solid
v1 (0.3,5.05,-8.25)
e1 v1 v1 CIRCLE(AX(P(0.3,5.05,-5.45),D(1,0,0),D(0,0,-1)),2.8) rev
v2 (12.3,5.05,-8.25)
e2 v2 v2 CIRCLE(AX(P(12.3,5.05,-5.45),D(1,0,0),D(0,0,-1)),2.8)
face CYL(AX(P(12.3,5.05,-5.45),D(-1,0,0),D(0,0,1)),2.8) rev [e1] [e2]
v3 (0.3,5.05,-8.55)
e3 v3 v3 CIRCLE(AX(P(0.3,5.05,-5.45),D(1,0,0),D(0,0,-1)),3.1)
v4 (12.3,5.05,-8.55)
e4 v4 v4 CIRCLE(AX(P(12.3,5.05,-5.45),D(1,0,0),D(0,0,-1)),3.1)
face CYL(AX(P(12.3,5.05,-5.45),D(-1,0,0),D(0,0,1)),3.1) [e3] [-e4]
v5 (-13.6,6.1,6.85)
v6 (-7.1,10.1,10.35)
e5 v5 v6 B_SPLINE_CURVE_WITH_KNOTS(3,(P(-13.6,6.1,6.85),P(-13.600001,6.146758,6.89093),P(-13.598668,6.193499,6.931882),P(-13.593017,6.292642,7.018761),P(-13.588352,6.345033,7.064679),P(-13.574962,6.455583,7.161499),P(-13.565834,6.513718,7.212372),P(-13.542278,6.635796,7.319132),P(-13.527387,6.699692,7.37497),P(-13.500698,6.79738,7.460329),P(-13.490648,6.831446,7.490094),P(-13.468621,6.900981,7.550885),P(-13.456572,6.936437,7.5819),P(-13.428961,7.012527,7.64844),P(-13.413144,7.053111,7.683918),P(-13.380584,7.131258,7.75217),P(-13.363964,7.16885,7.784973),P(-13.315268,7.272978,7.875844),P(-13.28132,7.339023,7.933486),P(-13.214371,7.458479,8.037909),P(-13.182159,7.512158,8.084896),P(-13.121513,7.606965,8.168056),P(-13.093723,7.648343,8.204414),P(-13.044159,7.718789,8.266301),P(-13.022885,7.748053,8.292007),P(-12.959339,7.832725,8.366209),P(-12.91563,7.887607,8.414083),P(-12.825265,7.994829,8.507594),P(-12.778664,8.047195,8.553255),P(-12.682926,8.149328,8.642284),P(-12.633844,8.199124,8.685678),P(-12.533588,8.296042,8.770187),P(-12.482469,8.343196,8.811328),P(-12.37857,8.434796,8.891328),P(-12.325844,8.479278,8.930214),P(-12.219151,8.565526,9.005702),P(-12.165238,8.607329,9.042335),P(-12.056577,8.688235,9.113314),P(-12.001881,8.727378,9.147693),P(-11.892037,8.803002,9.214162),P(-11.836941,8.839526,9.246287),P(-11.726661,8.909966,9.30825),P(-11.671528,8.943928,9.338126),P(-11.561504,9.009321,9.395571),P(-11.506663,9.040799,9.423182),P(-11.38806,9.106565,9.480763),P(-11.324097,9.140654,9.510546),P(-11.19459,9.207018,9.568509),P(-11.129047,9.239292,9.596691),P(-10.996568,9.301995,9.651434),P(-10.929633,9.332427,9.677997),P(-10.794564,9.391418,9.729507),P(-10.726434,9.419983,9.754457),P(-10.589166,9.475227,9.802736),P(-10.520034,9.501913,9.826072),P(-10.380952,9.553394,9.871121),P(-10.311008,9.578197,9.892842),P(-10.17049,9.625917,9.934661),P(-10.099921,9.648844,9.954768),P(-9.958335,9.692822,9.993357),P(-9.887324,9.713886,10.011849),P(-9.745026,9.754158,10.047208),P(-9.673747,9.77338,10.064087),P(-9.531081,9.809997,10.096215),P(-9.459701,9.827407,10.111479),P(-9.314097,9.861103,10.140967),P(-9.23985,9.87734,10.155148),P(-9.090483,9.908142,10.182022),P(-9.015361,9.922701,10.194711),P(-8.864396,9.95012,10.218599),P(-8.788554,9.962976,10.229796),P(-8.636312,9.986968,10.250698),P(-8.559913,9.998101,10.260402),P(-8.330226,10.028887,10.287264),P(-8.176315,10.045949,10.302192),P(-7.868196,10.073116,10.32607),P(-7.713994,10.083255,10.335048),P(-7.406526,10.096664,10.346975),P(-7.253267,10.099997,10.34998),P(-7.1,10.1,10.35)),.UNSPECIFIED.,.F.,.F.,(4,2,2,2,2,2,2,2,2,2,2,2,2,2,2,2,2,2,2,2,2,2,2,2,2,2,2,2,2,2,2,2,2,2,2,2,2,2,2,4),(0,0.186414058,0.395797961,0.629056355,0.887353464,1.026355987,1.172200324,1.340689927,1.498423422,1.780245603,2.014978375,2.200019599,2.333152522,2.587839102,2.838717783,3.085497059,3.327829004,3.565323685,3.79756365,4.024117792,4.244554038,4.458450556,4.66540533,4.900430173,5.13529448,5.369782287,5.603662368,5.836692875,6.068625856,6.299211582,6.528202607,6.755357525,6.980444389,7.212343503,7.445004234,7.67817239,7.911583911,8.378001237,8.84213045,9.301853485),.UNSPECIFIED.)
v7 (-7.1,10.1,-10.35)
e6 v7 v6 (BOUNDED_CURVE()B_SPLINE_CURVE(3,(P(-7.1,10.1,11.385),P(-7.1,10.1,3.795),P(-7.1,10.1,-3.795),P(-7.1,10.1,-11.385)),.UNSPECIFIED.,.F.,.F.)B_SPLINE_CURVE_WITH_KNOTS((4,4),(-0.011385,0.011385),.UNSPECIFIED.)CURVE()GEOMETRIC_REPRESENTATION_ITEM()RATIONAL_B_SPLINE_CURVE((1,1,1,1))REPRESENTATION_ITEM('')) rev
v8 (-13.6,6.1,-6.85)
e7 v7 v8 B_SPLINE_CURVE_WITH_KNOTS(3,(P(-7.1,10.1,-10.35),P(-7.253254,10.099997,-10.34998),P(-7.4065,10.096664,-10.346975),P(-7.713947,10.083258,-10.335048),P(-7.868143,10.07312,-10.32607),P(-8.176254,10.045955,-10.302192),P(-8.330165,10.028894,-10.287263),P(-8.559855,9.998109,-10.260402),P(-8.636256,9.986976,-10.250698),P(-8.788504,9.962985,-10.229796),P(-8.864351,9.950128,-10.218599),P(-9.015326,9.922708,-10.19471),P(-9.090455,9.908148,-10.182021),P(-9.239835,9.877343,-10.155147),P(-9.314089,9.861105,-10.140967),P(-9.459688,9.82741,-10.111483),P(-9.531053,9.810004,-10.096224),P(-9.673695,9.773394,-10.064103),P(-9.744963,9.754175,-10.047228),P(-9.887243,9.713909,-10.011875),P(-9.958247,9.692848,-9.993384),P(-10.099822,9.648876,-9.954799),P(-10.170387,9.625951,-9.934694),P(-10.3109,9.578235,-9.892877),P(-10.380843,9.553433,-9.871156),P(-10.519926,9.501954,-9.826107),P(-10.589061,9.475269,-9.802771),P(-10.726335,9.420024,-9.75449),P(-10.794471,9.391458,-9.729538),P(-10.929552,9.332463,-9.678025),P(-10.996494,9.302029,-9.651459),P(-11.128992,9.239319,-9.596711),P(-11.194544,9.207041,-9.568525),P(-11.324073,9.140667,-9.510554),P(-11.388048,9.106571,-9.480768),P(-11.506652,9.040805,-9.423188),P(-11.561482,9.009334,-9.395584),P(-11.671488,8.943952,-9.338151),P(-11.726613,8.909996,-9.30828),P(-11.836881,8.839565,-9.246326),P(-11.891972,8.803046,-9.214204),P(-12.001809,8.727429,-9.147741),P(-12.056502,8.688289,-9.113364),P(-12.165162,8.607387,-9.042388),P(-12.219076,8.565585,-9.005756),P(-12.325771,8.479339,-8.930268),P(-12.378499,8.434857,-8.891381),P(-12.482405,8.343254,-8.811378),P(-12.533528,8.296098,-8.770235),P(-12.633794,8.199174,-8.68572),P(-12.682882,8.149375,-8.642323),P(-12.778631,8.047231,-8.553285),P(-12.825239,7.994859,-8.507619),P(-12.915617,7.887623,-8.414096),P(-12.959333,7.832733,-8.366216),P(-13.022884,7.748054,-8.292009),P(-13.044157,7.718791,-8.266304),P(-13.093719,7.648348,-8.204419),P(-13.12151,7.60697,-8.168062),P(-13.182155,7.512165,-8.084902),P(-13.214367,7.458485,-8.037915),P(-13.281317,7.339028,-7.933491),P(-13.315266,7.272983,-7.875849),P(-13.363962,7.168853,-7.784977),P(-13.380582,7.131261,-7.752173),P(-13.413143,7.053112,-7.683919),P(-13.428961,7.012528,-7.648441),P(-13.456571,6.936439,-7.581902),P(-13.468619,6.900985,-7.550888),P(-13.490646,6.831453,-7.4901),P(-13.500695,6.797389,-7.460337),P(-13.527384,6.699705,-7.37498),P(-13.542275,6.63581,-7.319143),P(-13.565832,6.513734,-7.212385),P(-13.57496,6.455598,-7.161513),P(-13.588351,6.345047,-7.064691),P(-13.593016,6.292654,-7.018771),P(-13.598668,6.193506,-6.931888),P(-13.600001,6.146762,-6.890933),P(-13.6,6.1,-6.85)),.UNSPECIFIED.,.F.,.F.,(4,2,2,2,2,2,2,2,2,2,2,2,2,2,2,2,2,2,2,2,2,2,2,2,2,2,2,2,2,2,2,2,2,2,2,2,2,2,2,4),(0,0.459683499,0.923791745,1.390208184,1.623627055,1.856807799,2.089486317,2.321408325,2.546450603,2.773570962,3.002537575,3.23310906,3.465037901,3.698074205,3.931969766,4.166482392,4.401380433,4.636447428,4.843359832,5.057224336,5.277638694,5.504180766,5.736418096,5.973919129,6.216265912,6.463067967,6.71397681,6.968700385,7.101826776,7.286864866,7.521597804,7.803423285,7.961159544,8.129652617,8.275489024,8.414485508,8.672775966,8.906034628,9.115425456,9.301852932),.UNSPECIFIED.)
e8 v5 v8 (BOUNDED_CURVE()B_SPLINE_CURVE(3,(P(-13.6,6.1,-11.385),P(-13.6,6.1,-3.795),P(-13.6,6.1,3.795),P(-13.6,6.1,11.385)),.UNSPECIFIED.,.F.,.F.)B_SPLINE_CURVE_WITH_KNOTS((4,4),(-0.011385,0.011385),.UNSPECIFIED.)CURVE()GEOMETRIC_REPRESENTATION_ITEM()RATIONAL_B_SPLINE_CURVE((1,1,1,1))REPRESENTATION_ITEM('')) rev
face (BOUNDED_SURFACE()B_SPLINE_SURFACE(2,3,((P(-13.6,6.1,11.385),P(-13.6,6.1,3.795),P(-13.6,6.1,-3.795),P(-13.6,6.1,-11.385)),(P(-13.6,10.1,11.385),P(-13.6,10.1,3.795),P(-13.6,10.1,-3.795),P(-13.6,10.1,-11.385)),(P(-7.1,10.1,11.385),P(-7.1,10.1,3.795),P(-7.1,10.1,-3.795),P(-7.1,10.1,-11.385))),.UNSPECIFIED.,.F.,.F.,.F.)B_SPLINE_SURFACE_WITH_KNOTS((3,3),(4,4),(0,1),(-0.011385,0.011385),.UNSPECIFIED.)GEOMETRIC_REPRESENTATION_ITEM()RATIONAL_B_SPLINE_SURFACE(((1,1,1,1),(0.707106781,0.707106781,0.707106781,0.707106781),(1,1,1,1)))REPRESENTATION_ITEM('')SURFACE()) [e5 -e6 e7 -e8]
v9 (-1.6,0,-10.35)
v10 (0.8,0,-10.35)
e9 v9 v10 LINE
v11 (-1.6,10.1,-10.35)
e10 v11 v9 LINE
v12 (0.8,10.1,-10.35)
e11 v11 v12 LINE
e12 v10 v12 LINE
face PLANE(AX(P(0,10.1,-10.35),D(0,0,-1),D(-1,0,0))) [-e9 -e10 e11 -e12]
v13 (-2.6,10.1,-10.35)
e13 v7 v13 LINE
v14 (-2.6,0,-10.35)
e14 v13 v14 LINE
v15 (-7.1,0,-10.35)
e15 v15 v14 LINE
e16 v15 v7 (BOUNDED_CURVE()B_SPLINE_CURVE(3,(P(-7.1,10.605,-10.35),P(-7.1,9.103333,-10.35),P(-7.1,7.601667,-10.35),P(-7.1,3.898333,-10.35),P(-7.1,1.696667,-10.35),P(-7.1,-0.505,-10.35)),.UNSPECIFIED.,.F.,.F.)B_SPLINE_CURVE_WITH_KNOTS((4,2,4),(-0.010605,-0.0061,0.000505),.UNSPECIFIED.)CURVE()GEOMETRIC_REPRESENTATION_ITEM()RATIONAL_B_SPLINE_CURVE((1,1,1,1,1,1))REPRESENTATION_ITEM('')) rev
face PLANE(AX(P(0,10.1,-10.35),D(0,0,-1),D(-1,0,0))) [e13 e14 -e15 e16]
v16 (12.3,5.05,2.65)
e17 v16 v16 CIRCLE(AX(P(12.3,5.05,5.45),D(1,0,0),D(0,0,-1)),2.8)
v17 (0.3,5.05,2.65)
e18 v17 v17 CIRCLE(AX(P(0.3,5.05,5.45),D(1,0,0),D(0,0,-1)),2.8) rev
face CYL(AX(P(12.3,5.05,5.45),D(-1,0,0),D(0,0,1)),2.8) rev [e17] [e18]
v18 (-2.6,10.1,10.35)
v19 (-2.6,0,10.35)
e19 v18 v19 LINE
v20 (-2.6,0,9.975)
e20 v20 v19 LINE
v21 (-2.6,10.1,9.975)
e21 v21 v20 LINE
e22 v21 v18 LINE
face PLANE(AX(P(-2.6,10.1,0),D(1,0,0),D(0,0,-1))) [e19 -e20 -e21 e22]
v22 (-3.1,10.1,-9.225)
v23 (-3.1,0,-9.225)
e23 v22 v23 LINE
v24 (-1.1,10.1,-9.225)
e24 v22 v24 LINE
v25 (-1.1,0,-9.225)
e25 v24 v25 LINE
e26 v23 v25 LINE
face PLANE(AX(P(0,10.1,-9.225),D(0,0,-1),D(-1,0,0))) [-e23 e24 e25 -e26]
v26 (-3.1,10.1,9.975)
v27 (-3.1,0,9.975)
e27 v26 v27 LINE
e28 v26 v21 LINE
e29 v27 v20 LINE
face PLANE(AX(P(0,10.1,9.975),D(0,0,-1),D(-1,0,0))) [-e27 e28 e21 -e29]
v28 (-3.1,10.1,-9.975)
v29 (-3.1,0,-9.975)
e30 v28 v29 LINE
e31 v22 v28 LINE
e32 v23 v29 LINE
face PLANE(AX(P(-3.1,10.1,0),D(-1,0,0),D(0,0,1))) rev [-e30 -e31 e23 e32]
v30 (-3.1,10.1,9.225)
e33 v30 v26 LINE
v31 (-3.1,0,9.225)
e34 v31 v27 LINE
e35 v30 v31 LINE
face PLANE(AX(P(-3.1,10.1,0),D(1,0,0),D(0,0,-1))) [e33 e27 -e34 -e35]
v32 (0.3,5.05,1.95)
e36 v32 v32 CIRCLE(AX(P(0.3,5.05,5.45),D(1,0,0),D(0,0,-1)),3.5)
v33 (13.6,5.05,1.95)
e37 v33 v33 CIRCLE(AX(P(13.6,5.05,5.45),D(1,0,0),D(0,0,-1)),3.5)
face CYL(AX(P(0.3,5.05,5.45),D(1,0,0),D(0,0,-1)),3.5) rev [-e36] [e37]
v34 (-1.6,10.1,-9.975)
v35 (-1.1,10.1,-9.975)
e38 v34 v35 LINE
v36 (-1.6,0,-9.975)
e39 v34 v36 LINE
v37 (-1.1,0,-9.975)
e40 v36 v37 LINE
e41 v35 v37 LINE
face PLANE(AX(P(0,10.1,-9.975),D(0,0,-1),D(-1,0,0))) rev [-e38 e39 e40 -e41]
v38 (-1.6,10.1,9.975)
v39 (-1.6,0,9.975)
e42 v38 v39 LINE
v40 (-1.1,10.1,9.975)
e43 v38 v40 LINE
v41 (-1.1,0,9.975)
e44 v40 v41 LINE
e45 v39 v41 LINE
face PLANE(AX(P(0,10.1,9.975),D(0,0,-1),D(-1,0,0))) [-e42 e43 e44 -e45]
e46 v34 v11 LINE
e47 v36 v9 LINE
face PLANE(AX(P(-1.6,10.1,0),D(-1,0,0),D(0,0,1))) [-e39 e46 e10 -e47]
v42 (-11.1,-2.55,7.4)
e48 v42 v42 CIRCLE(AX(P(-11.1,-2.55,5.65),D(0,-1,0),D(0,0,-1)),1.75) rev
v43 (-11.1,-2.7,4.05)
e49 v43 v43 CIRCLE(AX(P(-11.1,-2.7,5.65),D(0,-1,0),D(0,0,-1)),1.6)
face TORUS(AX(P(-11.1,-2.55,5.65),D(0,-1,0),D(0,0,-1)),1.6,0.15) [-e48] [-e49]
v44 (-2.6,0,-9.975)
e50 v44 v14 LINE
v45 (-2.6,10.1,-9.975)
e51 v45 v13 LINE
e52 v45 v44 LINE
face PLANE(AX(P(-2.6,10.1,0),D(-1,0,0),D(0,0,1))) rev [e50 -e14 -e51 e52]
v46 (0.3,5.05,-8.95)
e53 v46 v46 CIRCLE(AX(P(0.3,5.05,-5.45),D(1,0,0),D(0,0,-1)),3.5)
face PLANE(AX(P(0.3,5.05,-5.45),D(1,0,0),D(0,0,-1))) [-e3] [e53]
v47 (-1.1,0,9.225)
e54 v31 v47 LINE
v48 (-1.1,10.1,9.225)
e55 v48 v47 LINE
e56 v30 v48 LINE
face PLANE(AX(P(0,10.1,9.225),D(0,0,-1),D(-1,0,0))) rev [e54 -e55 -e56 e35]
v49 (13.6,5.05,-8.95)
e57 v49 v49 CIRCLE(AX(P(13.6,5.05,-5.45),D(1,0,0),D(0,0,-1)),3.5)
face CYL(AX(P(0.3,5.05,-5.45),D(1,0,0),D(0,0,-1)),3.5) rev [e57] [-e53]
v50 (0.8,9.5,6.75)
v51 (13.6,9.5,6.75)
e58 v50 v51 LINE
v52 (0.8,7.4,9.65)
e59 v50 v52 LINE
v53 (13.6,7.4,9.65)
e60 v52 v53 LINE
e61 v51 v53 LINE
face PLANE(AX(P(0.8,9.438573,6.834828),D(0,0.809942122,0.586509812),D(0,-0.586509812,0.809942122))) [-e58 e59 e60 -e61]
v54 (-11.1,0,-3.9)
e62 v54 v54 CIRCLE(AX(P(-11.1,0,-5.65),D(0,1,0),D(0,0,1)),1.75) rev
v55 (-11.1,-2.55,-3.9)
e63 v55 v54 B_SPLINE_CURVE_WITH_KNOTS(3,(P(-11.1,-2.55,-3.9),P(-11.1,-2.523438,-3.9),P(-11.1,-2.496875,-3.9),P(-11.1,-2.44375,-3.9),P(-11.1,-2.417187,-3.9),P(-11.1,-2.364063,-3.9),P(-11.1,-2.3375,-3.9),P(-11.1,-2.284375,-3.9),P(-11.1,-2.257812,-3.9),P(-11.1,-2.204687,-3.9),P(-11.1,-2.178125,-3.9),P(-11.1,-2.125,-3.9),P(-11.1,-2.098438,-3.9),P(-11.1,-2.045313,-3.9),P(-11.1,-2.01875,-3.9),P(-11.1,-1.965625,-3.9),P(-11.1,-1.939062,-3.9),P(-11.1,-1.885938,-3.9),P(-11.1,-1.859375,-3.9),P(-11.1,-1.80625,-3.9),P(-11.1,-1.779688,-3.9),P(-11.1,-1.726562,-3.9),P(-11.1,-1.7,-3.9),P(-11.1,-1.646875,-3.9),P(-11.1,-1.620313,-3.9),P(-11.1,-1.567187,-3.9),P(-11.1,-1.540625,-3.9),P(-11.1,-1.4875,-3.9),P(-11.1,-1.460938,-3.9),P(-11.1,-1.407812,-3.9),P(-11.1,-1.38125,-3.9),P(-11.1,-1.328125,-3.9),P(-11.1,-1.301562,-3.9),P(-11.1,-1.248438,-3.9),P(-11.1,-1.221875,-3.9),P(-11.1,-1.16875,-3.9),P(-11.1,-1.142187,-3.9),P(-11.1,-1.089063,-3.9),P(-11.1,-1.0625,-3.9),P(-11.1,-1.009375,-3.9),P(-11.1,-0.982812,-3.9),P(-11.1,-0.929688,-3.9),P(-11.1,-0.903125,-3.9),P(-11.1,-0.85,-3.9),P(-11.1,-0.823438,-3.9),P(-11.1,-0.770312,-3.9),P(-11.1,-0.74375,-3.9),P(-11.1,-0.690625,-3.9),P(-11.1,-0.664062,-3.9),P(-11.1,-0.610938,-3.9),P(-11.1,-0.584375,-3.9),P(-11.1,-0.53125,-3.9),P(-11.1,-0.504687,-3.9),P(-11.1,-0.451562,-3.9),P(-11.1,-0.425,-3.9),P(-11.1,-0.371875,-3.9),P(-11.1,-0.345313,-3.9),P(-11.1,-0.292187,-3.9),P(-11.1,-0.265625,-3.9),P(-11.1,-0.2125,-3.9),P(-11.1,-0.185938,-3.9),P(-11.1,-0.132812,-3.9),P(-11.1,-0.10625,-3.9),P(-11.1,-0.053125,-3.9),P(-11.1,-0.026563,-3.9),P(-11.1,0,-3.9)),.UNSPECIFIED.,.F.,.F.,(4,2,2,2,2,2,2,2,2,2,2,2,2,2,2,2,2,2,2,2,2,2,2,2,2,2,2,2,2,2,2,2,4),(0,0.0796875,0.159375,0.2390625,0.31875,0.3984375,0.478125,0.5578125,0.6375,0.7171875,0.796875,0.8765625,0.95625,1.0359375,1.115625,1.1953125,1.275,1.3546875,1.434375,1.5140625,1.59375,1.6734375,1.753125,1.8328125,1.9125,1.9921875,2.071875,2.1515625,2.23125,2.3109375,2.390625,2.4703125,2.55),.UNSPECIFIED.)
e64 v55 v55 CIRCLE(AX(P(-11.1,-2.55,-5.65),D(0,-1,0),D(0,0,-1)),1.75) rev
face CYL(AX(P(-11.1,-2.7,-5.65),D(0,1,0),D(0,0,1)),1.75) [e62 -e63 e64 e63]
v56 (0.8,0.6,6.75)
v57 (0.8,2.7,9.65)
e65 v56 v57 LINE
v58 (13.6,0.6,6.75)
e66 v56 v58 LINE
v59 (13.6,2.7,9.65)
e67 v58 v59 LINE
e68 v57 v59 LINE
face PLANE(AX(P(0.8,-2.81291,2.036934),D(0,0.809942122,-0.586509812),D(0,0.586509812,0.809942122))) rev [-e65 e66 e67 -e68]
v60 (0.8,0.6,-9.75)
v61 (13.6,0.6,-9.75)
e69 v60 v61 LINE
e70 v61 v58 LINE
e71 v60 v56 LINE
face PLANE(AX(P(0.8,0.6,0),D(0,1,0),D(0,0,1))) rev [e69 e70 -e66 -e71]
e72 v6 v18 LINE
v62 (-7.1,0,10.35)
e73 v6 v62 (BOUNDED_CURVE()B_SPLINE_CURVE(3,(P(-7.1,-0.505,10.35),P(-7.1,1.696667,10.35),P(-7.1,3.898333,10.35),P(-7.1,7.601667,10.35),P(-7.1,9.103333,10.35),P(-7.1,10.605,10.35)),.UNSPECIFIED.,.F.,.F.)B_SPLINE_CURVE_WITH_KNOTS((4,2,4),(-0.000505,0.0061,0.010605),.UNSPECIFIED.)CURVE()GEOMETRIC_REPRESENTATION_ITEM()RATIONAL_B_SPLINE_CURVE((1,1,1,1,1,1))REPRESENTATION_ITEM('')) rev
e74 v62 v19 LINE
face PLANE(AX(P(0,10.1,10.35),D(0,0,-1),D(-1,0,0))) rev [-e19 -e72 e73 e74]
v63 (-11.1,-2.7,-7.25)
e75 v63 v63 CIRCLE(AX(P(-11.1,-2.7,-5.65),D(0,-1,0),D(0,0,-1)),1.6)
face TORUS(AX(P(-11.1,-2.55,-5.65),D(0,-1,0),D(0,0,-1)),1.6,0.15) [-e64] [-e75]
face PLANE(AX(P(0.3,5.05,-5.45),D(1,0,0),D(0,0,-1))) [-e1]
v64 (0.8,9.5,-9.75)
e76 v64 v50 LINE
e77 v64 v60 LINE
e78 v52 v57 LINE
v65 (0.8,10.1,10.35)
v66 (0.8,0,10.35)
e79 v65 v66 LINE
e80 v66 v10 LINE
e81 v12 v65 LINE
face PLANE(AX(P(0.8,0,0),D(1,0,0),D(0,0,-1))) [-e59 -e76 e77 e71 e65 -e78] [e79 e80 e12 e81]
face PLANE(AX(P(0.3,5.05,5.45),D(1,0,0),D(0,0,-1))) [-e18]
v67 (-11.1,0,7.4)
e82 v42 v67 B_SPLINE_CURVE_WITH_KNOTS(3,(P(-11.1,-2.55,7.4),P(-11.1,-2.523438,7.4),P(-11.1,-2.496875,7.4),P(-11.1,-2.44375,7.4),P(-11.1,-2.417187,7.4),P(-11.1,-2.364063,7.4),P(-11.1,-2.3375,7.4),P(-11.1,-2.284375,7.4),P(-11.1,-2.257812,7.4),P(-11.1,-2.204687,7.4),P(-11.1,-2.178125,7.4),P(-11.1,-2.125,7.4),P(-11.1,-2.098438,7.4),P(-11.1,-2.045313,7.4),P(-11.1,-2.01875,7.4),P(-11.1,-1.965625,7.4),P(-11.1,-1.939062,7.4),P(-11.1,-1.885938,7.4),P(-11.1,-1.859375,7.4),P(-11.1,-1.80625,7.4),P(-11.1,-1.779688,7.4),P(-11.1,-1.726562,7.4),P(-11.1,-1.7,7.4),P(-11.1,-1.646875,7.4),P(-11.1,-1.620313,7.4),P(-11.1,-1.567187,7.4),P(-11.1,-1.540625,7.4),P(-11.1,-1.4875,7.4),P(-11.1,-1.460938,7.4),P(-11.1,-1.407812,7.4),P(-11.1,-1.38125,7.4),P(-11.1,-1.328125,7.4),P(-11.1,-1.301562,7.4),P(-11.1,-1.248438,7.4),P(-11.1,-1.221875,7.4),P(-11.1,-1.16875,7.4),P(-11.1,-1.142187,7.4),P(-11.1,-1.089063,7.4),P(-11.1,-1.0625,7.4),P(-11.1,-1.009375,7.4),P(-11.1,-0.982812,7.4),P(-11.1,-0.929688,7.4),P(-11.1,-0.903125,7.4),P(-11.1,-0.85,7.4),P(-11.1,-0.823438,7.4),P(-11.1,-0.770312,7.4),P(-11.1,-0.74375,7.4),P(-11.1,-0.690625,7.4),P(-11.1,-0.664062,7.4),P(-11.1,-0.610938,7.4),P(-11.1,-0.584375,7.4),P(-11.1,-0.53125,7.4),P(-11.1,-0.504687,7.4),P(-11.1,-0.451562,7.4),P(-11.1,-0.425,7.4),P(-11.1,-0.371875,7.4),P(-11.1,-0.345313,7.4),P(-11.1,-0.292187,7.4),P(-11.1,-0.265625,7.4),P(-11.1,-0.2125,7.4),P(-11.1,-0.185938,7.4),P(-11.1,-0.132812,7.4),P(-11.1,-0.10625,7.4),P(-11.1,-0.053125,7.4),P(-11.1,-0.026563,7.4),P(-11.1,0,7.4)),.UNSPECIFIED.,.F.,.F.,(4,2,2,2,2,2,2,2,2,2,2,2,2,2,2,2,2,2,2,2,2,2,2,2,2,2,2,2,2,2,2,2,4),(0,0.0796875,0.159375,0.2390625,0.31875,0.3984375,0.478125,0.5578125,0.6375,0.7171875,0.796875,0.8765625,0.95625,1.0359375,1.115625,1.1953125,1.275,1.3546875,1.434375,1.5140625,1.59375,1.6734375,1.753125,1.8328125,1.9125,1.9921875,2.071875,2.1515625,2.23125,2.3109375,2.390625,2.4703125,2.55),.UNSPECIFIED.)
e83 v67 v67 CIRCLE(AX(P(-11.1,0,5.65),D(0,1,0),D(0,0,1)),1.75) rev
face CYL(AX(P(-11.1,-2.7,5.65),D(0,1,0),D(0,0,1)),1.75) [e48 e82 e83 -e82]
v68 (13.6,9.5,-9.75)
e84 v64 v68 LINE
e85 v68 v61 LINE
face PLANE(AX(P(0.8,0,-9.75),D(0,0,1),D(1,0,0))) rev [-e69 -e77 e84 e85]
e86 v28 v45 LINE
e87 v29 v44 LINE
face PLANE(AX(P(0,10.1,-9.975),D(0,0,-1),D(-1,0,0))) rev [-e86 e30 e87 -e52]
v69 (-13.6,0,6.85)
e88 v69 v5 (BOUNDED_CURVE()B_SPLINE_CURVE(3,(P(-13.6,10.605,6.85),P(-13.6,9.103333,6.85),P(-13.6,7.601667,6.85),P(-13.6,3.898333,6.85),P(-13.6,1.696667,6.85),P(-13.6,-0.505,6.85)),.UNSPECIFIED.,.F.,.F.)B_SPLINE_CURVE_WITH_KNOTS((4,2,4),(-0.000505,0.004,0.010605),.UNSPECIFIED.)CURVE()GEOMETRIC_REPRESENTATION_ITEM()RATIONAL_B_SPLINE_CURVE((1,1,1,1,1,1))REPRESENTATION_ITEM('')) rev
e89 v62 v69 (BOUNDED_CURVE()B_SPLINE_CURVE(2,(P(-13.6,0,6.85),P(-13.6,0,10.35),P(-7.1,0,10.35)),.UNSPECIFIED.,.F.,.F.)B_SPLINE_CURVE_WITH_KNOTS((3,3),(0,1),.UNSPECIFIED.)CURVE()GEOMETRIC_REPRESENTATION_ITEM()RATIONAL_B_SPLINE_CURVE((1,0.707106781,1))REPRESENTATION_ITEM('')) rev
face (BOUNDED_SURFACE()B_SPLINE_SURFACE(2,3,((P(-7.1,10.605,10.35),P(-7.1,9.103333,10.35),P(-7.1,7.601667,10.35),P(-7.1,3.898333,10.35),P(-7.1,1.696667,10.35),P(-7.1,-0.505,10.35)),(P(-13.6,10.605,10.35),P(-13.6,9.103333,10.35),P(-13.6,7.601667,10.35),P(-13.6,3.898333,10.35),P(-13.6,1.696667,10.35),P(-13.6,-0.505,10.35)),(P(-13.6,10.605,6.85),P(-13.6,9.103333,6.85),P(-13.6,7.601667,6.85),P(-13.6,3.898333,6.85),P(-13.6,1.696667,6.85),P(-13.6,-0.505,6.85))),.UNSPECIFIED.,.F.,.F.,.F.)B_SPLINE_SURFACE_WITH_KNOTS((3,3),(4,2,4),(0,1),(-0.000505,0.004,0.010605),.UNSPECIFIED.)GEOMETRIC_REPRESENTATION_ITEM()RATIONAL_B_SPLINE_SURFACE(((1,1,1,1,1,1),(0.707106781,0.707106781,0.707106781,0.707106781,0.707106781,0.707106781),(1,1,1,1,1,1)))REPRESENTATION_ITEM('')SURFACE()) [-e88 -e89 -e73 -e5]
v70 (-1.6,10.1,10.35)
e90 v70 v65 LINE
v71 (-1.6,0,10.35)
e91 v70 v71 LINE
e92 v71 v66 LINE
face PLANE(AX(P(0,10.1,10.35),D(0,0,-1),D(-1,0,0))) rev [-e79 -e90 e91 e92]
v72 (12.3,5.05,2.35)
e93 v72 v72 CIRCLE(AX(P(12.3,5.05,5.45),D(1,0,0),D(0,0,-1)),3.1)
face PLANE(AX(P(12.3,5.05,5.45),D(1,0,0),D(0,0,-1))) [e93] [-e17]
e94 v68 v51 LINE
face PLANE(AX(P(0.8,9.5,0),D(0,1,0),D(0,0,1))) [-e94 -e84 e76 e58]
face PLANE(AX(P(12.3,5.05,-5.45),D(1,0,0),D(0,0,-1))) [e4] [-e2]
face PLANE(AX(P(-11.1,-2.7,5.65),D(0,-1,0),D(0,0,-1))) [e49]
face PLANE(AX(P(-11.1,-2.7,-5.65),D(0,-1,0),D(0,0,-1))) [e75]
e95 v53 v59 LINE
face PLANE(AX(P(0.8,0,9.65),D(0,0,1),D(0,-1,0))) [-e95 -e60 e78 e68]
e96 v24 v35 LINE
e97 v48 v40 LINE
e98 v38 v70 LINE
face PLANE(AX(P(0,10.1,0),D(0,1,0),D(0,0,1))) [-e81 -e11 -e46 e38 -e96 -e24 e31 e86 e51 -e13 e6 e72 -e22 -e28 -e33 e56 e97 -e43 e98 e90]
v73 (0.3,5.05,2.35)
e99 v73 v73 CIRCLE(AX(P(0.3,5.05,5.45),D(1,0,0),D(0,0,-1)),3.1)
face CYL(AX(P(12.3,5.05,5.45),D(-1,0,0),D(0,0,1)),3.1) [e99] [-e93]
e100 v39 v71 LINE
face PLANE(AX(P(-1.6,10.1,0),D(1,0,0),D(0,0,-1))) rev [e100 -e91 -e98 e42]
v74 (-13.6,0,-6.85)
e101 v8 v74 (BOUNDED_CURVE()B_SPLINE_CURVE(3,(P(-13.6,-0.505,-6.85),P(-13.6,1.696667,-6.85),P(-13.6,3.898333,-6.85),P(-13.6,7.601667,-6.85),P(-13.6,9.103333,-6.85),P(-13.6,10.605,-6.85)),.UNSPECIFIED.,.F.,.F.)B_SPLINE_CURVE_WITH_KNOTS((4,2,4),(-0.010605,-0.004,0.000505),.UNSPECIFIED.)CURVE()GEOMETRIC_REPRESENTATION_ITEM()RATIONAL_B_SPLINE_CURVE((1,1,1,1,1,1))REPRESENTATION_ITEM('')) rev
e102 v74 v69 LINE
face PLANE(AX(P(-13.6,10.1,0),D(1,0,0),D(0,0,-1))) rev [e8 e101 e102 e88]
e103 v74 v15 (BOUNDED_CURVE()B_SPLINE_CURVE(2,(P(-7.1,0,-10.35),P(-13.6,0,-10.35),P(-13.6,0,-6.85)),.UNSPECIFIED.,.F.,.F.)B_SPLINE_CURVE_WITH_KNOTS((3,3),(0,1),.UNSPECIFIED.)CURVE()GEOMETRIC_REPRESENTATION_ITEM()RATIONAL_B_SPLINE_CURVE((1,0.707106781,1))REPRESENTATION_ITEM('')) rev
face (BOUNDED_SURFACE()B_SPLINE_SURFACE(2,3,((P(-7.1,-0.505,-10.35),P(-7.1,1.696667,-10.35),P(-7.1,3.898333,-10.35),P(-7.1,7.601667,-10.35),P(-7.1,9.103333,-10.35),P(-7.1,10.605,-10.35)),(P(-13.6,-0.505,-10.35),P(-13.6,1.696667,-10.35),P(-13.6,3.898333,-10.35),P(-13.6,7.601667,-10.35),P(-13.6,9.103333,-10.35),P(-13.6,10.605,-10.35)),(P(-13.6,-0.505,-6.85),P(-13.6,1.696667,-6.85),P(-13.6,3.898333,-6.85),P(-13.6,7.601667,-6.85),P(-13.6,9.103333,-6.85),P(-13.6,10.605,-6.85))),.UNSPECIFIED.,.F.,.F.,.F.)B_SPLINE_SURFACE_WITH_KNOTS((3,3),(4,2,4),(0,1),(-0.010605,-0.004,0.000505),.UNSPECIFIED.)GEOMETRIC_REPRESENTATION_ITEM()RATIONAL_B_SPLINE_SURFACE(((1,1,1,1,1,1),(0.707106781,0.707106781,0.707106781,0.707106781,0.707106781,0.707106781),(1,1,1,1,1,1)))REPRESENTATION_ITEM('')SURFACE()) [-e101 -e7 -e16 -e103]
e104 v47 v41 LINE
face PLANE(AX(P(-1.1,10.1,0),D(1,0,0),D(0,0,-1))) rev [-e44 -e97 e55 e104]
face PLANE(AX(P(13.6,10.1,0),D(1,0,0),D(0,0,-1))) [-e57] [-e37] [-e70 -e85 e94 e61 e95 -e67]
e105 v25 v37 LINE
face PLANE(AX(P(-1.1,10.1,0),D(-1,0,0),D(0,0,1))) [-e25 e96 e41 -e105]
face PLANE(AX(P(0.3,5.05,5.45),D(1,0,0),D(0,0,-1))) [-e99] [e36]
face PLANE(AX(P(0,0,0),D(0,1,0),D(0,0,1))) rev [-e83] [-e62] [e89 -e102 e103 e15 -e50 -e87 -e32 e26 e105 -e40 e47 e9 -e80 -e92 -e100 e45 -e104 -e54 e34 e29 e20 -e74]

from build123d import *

# Parameters (mm, degrees)
SKETCH1_W           = 6.5
SKETCH1_H           = 20.7
BOSS_EXTRUDE1_DEPTH = 10.1
FILLET1_SIZE        = 4
FILLET1_SIZE_2      = 6.5
FILLET2_SIZE        = 3.5
FILLET2_SIZE_2      = 6.5
SKETCH4_R           = 1.75
BOSS_EXTRUDE3_DEPTH = 2.7
FILLET4_R           = 0.15
SKETCH2_W           = 20.7
SKETCH2_H           = 10.1
CUT_EXTRUDE1_DEPTH  = 12.8
SKETCH5_R           = 3.5
CUT_EXTRUDE2_DEPTH  = 13.3
SKETCH6_R           = 3.1
SKETCH6_R_2         = 2.8
BOSS_EXTRUDE4_DEPTH = 12


with BuildPart() as part:
    # Sketch1 → Boss-Extrude1 (new body)
    with BuildSketch(Plane(origin=(0, 0, 0), x_dir=(1, 0, 0), z_dir=(0, 1, 0))):
        Polygon((-2.6, 10.35), (-7.1, 10.35), (-7.1, -10.35), (-2.6, -10.35), (-2.6, -9.975), (-3.1, -9.975), (-3.1, -9.225), (-1.1, -9.225), (-1.1, -9.975), (-1.6, -9.975), (-1.6, -10.35), (13.6, -10.35), (13.6, 10.35), (-1.6, 10.35), (-1.6, 9.975), (-1.1, 9.975), (-1.1, 9.225), (-3.1, 9.225), (-3.1, 9.975), (-2.6, 9.975), align=None)
        with Locations((-10.35, 0)):
            Rectangle(SKETCH1_W, SKETCH1_H)
    extrude(amount=BOSS_EXTRUDE1_DEPTH)

    # Fillet1
    # a fillet whose section is not a circle: 6.5, 4 mm, written as the material it takes off along each edge
    with BuildSketch(Plane(origin=(-13.6, 10.1, -26.6), x_dir=(0, -1, 0), z_dir=(0, 0, 1))) as fillet1_piece_1:
        with BuildLine():
            Bezier((FILLET1_SIZE, 0), (0, 0), (0, FILLET1_SIZE_2), weights=[1, 0.707106781, 1])
            Line((0, FILLET1_SIZE_2), (0, 0))
            Line((0, 0), (FILLET1_SIZE, 0))
        make_face()
    extrude(amount=53.2, mode=Mode.SUBTRACT)

    # Fillet2
    # a fillet whose section is not a circle: 6.5, 3.5 mm, written as the material it takes off along each edge
    with BuildSketch(Plane(origin=(-13.6, -16.25, 10.35), x_dir=(0, 0, -1), z_dir=(0, 1, 0))) as fillet2_piece_1:
        with BuildLine():
            Bezier((FILLET2_SIZE, 0), (0, 0), (0, -FILLET2_SIZE_2), weights=[1, 0.707106781, 1])
            Line((0, -FILLET2_SIZE_2), (0, 0))
            Line((0, 0), (FILLET2_SIZE, 0))
        make_face()
    extrude(amount=38.6, mode=Mode.SUBTRACT)
    with BuildSketch(Plane(origin=(-13.6, -16.25, -10.35), x_dir=(1, 0, 0), z_dir=(0, 1, 0))) as fillet2_piece_2:
        with BuildLine():
            Bezier((FILLET2_SIZE_2, 0), (0, 0), (0, -FILLET2_SIZE), weights=[1, 0.707106781, 1])
            Line((0, -FILLET2_SIZE), (0, 0))
            Line((0, 0), (FILLET2_SIZE_2, 0))
        make_face()
    extrude(amount=38.6, mode=Mode.SUBTRACT)

    # Sketch4 → Boss-Extrude3 (add)
    with BuildSketch(Plane.XZ):
        with Locations(Location((-11.1, -5.65, 0), (0, 0, 90))):
            Circle(SKETCH4_R)
        with Locations(Location((-11.1, 5.65, 0), (0, 0, 90))):
            Circle(SKETCH4_R)
    extrude(amount=BOSS_EXTRUDE3_DEPTH)

    # Fillet4
    fillet4_edges = [part.edges().sort_by_distance(p)[0] for p in [
        (-11.1, -2.7, -7.4),
        (-11.1, -2.7, 3.9),
    ]]
    fillet(fillet4_edges, radius=FILLET4_R)

    # Sketch2 → Cut-Extrude1 (cut)
    with BuildSketch(Plane(origin=(13.6, 0, 0), x_dir=(0, 0, -1), z_dir=(1, 0, 0))):
        with Locations((0, 5.05)):
            Rectangle(SKETCH2_W, SKETCH2_H)
        Polygon((-9.65, 7.4), (-9.65, 2.7), (-6.75, 0.6), (6.85, 0.6), (9.75, 0.6), (9.75, 9.5), (6.85, 9.5), (-6.75, 9.5), align=None, mode=Mode.SUBTRACT)
    extrude(amount=-CUT_EXTRUDE1_DEPTH, mode=Mode.SUBTRACT)

    # Sketch5 → Cut-Extrude2 (cut)
    with BuildSketch(Plane(origin=(13.6, 0, 0), x_dir=(0, 0, -1), z_dir=(1, 0, 0))):
        with Locations((-5.45, 5.05)):
            Circle(SKETCH5_R)
        with Locations((5.45, 5.05)):
            Circle(SKETCH5_R)
    extrude(amount=-CUT_EXTRUDE2_DEPTH, mode=Mode.SUBTRACT)

    # Sketch6 → Boss-Extrude4 (add)
    # profile 1 of 2: a face of its own
    with BuildSketch(Plane(origin=(0.3, 0, 0), x_dir=(0, 0, -1), z_dir=(1, 0, 0))):
        with Locations((-5.45, 5.05)):
            Circle(SKETCH6_R)
        with Locations((-5.45, 5.05)):
            Circle(SKETCH6_R_2, mode=Mode.SUBTRACT)
    # profile 2 of 2: a face of its own
    with BuildSketch(Plane(origin=(0.3, 0, 0), x_dir=(0, 0, -1), z_dir=(1, 0, 0))):
        with Locations((5.45, 5.05)):
            Circle(SKETCH6_R)
        with Locations((5.45, 5.05)):
            Circle(SKETCH6_R_2, mode=Mode.SUBTRACT)
    extrude(amount=BOSS_EXTRUDE4_DEPTH)


solid = part.part
